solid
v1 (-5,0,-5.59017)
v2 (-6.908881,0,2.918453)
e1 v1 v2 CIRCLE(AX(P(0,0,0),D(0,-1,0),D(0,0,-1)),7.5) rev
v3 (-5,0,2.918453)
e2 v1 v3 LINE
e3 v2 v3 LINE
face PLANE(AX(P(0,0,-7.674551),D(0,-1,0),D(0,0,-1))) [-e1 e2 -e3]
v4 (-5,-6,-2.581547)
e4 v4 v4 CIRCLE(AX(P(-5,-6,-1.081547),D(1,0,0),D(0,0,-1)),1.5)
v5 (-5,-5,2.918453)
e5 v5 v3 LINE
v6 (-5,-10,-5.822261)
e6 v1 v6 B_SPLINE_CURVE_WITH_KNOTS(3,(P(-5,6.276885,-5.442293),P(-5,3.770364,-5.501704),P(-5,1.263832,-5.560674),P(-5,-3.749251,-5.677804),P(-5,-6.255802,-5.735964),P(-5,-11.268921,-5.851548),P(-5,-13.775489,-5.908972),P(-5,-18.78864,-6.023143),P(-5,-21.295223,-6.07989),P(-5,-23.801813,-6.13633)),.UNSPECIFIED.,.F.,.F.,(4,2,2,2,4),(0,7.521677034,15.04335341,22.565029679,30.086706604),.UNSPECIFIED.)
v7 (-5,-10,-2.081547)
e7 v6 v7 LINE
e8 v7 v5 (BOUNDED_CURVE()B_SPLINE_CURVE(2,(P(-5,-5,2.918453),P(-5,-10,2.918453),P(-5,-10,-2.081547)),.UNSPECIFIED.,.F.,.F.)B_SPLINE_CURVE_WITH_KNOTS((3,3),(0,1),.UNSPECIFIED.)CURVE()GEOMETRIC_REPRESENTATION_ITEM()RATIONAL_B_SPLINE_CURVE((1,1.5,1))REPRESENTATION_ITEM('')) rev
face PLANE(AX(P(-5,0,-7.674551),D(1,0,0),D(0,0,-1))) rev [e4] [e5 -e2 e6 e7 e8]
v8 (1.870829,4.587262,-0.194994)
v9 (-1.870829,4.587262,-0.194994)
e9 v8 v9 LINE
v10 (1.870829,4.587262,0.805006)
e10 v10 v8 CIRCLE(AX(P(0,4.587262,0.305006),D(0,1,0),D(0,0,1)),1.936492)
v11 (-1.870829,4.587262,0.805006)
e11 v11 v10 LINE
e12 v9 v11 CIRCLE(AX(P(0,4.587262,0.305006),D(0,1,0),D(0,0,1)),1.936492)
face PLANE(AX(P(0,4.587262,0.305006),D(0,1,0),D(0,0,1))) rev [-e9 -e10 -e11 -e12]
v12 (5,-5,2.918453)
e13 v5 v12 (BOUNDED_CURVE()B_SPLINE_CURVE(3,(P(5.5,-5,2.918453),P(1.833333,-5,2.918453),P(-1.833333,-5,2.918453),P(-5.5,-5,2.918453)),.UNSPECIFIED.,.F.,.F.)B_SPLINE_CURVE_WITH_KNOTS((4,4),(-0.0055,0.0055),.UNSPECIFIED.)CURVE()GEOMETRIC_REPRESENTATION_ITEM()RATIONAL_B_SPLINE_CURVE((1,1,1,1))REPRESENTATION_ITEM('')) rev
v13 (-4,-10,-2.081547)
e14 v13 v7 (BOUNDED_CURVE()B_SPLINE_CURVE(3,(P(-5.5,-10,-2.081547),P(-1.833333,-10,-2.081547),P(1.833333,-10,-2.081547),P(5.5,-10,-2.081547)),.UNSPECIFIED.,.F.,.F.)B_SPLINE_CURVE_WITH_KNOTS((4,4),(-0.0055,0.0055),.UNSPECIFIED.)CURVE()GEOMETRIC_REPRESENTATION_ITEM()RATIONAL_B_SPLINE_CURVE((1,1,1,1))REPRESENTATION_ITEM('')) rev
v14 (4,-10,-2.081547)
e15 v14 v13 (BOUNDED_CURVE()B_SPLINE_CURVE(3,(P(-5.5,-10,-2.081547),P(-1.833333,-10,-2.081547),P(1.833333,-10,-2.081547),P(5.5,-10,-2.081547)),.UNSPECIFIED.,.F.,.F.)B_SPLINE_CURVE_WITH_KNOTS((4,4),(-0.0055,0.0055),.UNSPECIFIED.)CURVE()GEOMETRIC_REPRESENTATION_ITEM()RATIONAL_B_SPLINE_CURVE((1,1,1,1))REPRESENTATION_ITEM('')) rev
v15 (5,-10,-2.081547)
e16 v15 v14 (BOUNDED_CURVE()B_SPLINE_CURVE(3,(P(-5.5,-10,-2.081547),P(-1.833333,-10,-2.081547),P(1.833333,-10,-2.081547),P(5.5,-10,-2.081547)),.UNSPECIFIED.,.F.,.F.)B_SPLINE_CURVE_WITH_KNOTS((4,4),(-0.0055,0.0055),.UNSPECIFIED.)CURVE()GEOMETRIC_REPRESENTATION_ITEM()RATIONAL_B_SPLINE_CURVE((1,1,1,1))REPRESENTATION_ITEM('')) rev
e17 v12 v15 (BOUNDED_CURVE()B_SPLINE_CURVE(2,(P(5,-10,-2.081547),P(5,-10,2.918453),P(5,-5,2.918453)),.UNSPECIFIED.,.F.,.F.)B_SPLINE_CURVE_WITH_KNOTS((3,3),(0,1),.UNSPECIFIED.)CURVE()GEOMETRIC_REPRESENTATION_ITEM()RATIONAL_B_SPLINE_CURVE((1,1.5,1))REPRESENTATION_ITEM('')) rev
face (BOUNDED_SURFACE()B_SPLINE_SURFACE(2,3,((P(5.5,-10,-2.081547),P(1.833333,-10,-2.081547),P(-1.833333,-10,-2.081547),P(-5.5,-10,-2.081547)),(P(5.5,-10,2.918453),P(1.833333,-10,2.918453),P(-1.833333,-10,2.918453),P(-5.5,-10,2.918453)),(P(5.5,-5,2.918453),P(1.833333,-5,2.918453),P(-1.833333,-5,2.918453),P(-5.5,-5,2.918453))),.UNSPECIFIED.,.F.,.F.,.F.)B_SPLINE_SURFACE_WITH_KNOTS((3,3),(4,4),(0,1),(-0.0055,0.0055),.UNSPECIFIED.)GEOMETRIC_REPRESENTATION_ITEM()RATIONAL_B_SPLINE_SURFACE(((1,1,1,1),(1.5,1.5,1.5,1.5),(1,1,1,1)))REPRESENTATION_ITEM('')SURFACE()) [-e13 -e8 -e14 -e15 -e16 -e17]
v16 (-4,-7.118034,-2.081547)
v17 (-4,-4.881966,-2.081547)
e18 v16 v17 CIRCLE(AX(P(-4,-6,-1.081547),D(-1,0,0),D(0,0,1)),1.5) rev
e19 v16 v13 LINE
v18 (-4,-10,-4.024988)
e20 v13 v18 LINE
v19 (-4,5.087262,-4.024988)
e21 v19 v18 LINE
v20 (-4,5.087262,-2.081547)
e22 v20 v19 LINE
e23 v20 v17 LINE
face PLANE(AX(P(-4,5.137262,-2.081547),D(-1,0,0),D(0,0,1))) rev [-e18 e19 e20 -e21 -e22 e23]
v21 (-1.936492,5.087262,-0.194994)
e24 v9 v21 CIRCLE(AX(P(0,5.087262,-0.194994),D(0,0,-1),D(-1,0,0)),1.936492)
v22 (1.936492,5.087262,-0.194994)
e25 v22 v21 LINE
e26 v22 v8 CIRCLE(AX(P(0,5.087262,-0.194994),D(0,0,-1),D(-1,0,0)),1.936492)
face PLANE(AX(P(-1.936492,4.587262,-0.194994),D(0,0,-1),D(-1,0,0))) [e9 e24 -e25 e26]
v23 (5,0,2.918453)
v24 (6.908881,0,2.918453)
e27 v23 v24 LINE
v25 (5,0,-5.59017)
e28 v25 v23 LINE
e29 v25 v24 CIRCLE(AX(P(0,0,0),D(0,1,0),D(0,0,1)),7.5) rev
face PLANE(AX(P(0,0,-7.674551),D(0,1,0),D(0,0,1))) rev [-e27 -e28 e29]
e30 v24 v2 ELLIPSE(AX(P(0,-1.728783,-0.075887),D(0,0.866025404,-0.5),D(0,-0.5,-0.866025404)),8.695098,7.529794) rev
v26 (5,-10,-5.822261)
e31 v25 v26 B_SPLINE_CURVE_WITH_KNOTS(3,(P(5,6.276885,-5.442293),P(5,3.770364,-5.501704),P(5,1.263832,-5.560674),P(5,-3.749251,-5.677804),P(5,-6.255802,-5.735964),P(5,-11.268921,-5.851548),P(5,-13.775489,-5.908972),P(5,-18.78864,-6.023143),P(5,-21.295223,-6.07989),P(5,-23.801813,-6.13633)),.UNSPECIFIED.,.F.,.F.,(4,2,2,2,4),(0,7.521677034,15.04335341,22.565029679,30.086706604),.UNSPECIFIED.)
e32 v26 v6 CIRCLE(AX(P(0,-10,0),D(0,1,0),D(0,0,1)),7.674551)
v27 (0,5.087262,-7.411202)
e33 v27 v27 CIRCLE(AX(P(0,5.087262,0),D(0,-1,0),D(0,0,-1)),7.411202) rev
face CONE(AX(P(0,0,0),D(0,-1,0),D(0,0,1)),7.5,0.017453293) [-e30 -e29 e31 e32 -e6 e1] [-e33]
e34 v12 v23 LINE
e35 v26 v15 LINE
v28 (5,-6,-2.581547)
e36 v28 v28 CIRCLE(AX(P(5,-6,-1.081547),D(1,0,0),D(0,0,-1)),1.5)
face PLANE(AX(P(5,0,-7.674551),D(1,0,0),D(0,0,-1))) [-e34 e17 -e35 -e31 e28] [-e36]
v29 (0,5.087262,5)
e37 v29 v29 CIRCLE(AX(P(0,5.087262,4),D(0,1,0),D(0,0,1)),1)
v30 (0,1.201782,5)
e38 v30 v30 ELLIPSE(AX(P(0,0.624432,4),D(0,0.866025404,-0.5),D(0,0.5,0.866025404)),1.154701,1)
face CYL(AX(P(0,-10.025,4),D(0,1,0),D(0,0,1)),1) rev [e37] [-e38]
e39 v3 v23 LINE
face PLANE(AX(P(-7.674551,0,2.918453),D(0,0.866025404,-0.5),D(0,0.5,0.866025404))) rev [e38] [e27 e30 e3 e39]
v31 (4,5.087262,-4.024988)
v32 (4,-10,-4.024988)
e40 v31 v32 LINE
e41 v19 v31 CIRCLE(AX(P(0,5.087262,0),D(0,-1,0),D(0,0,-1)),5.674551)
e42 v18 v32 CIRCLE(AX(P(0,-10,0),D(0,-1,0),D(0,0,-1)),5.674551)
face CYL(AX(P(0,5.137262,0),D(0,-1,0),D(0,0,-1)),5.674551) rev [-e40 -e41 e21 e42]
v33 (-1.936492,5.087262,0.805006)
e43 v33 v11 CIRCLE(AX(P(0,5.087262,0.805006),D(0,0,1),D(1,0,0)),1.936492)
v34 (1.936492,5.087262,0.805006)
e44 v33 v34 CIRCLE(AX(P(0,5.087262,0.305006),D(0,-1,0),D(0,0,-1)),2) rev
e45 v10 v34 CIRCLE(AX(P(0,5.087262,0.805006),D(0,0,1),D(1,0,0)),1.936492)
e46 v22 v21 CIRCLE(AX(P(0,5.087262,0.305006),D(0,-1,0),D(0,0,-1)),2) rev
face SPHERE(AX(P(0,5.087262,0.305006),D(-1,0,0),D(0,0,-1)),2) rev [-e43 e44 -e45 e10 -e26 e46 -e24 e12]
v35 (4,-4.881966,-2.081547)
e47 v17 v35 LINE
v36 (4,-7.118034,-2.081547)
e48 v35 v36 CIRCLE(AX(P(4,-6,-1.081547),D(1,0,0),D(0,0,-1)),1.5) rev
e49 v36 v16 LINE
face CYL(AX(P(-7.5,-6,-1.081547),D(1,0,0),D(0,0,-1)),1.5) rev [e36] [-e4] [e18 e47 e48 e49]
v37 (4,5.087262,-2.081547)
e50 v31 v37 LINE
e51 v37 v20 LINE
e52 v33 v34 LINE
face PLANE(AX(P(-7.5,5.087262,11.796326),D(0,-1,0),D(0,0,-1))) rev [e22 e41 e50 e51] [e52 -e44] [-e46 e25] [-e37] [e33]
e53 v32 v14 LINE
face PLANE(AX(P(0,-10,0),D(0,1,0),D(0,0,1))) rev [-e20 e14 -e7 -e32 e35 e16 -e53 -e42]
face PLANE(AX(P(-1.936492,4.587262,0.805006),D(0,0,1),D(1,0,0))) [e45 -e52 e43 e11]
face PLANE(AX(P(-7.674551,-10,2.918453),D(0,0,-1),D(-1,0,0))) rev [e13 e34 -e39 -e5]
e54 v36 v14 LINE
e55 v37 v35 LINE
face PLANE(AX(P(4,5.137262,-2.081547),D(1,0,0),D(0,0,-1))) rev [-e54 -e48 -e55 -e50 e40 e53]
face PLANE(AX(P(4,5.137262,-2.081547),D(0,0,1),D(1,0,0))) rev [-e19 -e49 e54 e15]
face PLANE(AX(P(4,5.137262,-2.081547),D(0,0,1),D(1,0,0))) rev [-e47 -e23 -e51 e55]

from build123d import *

# Parameters (mm, degrees)
SKETCH1_R                     = 7.5
BOSS_EXTRUDE1_DEPTH           = 15
BOSS_EXTRUDE1_TAPER           = 1
BOSS_EXTRUDE1_OTHER_WAY_DEPTH = 10
BOSS_EXTRUDE1_OTHER_WAY_TAPER = -1
CUT_EXTRUDE1_DEPTH            = 19.514790178
CUT_EXTRUDE1_DEPTH_BACK       = 19.514790178
CUT_EXTRUDE2_START            = -10.593003294
CUT_EXTRUDE2_OUTLINE_W        = 6.502745185
CUT_EXTRUDE2_OUTLINE_H        = 10
CUT_EXTRUDE2_DEPTH            = 10.593003294
SKETCH5_R                     = 1.5
CUT_EXTRUDE3_DEPTH            = 21.979721988
FILLET1_SIZE                  = 5
CUT_EXTRUDE4_DEPTH            = 19.443121582
CUT_EXTRUDE4_DEPTH_BACK       = 19.443121582
SKETCH6_W                     = 21.270993481
SKETCH6_H                     = 9.912737968
CUT_EXTRUDE5_DEPTH            = 19.514162399
SKETCH8_R                     = 1
CUT_EXTRUDE6_DEPTH            = 19.514162399
BOSS_EXTRUDE2_DEPTH           = 0.5


with BuildPart() as part:
    # Sketch1 → Boss-Extrude1 (new body)
    with BuildSketch(Plane(origin=(0, 0, 0), x_dir=(1, 0, 0), z_dir=(0, 1, 0))):
        Circle(SKETCH1_R)
    extrude(amount=BOSS_EXTRUDE1_DEPTH, taper=BOSS_EXTRUDE1_TAPER)

    # Sketch1 → Boss-Extrude1 other way (add)
    with BuildSketch(Plane(origin=(0, 0, 0), x_dir=(1, 0, 0), z_dir=(0, 1, 0))):
        Circle(SKETCH1_R)
    extrude(amount=-BOSS_EXTRUDE1_OTHER_WAY_DEPTH, taper=BOSS_EXTRUDE1_OTHER_WAY_TAPER)

    # Sketch3 → Cut-Extrude1 (cut, two sides: drawn at the far end of the back side and taken through both)
    with BuildSketch(Plane(origin=(0, 0, 0), x_dir=(0, 0, -1), z_dir=(1, 0, 0)).offset(-CUT_EXTRUDE1_DEPTH_BACK)):
        Polygon((-2.918452544, -10), (-2.918452544, 0), (-14.964340612, 6.954696718), (-14.964340612, -10), align=None)
    extrude(amount=CUT_EXTRUDE1_DEPTH + CUT_EXTRUDE1_DEPTH_BACK, mode=Mode.SUBTRACT)

    # Cut-Extrude2: read off the stored shape, not the designer's step
    # Cut-Extrude2 outline → Cut-Extrude2 (cut)
    with BuildSketch(Plane.XY.offset(2.918452544).offset(CUT_EXTRUDE2_START)):
        with Locations((-8.251372593, -5)):
            Rectangle(CUT_EXTRUDE2_OUTLINE_W, CUT_EXTRUDE2_OUTLINE_H)
        with Locations((8.251372593, -5)):
            Rectangle(CUT_EXTRUDE2_OUTLINE_W, CUT_EXTRUDE2_OUTLINE_H)
    extrude(amount=CUT_EXTRUDE2_DEPTH, mode=Mode.SUBTRACT)

    # Sketch5 → Cut-Extrude3 (cut, through all)
    with BuildSketch(Plane(origin=(5, 0, 0), x_dir=(0, 0, -1), z_dir=(1, 0, 0))):
        with Locations((1.081547456, -6)):
            Circle(SKETCH5_R)
    extrude(amount=-CUT_EXTRUDE3_DEPTH, mode=Mode.SUBTRACT)

    # Fillet1
    # a fillet whose section is not a circle: 5 mm, written as the material it takes off along each edge
    with BuildSketch(Plane(origin=(17.5, -10, 2.918452544), x_dir=(0, 0, -1), z_dir=(-1, 0, 0))) as fillet1_piece_1:
        with BuildLine():
            Bezier((FILLET1_SIZE, 0), (0, 0), (0, -FILLET1_SIZE), weights=[1, 1.5, 1])
            Line((0, -FILLET1_SIZE), (0, 0))
            Line((0, 0), (FILLET1_SIZE, 0))
        make_face()
    extrude(amount=35, mode=Mode.SUBTRACT)

    # Fillet2
    # a fillet whose section is not a circle: 10, 5 mm, written as the material it takes off along each edge
    with BuildSketch(Plane(origin=(0, 15, 0), x_dir=(1, 0, 0), z_dir=(0, 0, -1))) as fillet2_piece_1:
        with BuildLine():
            Bezier((7.411201511, 9.912737968), (7.238174026, 0), (2.411963035, 0), weights=[1, 0.818181818, 1])
            Line((2.411963035, 0), (7.238174026, 0))
            Line((7.238174026, 0), (7.411201511, 9.912737968))
        make_face()
    revolve(axis=Axis((0, 15, 0), (0, -1, 0)), mode=Mode.SUBTRACT)

    # Sketch6 → Cut-Extrude4 (cut, two sides: drawn at the far end of the back side and taken through both)
    with BuildSketch(Plane(origin=(0, 0, 0), x_dir=(0, 0, -1), z_dir=(1, 0, 0)).offset(-CUT_EXTRUDE4_DEPTH_BACK)):
        with Locations((-1.160829525, 10.043631016)):
            Rectangle(SKETCH6_W, SKETCH6_H)
    extrude(amount=CUT_EXTRUDE4_DEPTH + CUT_EXTRUDE4_DEPTH_BACK, mode=Mode.SUBTRACT)

    # Sketch7 → Cut-Extrude5 (cut, through all)
    with BuildSketch(Plane.XZ.offset(10)):
        with BuildLine():
            Line((4, -2.081547456), (4, -4.024987586))
            ThreePointArc((4, -4.024987586), (0, -5.674550649), (-4, -4.024987586))
            Line((-4, -4.024987586), (-4, -2.081547456))
            Line((-4, -2.081547456), (4, -2.081547456))
        make_face()
    extrude(amount=-CUT_EXTRUDE5_DEPTH, mode=Mode.SUBTRACT)

    # Sketch8 → Cut-Extrude6 (cut, through all)
    with BuildSketch(Plane(origin=(0, 5.087262032, 0), x_dir=(1, 0, 0), z_dir=(0, 1, 0))):
        with Locations(Location((0, -4, 0), (0, 0, 270))):
            Circle(SKETCH8_R)
    extrude(amount=-CUT_EXTRUDE6_DEPTH, mode=Mode.SUBTRACT)

    # Sketch9 → Cut-Revolve3 (revolve, cut)
    with BuildSketch(Plane(origin=(0, 5.087262032, 0), x_dir=(1, 0, 0), z_dir=(0, 1, 0))):
        with BuildLine():
            Line((-2, -0.30500636), (2, -0.30500636))
            ThreePointArc((2, -0.30500636), (0, 1.69499364), (-2, -0.30500636))
        make_face()
    revolve(axis=Axis((-2, 5.087262032, 0.30500636), (1, 0, 0)), mode=Mode.SUBTRACT)

    # Sketch10 → Boss-Extrude2 (add)
    with BuildSketch(Plane(origin=(0, 5.087262032, 0), x_dir=(1, 0, 0), z_dir=(0, 1, 0))):
        with BuildLine():
            Line((-1.936491673, -0.80500636), (1.936491673, -0.80500636))
            ThreePointArc((1.936491673, -0.80500636), (2, -0.30500636), (1.936491673, 0.19499364))
            Line((1.936491673, 0.19499364), (-1.936491673, 0.19499364))
            ThreePointArc((-1.936491673, 0.19499364), (-2, -0.30500636), (-1.936491673, -0.80500636))
        make_face()
    extrude(amount=-BOSS_EXTRUDE2_DEPTH)


solid = part.part
